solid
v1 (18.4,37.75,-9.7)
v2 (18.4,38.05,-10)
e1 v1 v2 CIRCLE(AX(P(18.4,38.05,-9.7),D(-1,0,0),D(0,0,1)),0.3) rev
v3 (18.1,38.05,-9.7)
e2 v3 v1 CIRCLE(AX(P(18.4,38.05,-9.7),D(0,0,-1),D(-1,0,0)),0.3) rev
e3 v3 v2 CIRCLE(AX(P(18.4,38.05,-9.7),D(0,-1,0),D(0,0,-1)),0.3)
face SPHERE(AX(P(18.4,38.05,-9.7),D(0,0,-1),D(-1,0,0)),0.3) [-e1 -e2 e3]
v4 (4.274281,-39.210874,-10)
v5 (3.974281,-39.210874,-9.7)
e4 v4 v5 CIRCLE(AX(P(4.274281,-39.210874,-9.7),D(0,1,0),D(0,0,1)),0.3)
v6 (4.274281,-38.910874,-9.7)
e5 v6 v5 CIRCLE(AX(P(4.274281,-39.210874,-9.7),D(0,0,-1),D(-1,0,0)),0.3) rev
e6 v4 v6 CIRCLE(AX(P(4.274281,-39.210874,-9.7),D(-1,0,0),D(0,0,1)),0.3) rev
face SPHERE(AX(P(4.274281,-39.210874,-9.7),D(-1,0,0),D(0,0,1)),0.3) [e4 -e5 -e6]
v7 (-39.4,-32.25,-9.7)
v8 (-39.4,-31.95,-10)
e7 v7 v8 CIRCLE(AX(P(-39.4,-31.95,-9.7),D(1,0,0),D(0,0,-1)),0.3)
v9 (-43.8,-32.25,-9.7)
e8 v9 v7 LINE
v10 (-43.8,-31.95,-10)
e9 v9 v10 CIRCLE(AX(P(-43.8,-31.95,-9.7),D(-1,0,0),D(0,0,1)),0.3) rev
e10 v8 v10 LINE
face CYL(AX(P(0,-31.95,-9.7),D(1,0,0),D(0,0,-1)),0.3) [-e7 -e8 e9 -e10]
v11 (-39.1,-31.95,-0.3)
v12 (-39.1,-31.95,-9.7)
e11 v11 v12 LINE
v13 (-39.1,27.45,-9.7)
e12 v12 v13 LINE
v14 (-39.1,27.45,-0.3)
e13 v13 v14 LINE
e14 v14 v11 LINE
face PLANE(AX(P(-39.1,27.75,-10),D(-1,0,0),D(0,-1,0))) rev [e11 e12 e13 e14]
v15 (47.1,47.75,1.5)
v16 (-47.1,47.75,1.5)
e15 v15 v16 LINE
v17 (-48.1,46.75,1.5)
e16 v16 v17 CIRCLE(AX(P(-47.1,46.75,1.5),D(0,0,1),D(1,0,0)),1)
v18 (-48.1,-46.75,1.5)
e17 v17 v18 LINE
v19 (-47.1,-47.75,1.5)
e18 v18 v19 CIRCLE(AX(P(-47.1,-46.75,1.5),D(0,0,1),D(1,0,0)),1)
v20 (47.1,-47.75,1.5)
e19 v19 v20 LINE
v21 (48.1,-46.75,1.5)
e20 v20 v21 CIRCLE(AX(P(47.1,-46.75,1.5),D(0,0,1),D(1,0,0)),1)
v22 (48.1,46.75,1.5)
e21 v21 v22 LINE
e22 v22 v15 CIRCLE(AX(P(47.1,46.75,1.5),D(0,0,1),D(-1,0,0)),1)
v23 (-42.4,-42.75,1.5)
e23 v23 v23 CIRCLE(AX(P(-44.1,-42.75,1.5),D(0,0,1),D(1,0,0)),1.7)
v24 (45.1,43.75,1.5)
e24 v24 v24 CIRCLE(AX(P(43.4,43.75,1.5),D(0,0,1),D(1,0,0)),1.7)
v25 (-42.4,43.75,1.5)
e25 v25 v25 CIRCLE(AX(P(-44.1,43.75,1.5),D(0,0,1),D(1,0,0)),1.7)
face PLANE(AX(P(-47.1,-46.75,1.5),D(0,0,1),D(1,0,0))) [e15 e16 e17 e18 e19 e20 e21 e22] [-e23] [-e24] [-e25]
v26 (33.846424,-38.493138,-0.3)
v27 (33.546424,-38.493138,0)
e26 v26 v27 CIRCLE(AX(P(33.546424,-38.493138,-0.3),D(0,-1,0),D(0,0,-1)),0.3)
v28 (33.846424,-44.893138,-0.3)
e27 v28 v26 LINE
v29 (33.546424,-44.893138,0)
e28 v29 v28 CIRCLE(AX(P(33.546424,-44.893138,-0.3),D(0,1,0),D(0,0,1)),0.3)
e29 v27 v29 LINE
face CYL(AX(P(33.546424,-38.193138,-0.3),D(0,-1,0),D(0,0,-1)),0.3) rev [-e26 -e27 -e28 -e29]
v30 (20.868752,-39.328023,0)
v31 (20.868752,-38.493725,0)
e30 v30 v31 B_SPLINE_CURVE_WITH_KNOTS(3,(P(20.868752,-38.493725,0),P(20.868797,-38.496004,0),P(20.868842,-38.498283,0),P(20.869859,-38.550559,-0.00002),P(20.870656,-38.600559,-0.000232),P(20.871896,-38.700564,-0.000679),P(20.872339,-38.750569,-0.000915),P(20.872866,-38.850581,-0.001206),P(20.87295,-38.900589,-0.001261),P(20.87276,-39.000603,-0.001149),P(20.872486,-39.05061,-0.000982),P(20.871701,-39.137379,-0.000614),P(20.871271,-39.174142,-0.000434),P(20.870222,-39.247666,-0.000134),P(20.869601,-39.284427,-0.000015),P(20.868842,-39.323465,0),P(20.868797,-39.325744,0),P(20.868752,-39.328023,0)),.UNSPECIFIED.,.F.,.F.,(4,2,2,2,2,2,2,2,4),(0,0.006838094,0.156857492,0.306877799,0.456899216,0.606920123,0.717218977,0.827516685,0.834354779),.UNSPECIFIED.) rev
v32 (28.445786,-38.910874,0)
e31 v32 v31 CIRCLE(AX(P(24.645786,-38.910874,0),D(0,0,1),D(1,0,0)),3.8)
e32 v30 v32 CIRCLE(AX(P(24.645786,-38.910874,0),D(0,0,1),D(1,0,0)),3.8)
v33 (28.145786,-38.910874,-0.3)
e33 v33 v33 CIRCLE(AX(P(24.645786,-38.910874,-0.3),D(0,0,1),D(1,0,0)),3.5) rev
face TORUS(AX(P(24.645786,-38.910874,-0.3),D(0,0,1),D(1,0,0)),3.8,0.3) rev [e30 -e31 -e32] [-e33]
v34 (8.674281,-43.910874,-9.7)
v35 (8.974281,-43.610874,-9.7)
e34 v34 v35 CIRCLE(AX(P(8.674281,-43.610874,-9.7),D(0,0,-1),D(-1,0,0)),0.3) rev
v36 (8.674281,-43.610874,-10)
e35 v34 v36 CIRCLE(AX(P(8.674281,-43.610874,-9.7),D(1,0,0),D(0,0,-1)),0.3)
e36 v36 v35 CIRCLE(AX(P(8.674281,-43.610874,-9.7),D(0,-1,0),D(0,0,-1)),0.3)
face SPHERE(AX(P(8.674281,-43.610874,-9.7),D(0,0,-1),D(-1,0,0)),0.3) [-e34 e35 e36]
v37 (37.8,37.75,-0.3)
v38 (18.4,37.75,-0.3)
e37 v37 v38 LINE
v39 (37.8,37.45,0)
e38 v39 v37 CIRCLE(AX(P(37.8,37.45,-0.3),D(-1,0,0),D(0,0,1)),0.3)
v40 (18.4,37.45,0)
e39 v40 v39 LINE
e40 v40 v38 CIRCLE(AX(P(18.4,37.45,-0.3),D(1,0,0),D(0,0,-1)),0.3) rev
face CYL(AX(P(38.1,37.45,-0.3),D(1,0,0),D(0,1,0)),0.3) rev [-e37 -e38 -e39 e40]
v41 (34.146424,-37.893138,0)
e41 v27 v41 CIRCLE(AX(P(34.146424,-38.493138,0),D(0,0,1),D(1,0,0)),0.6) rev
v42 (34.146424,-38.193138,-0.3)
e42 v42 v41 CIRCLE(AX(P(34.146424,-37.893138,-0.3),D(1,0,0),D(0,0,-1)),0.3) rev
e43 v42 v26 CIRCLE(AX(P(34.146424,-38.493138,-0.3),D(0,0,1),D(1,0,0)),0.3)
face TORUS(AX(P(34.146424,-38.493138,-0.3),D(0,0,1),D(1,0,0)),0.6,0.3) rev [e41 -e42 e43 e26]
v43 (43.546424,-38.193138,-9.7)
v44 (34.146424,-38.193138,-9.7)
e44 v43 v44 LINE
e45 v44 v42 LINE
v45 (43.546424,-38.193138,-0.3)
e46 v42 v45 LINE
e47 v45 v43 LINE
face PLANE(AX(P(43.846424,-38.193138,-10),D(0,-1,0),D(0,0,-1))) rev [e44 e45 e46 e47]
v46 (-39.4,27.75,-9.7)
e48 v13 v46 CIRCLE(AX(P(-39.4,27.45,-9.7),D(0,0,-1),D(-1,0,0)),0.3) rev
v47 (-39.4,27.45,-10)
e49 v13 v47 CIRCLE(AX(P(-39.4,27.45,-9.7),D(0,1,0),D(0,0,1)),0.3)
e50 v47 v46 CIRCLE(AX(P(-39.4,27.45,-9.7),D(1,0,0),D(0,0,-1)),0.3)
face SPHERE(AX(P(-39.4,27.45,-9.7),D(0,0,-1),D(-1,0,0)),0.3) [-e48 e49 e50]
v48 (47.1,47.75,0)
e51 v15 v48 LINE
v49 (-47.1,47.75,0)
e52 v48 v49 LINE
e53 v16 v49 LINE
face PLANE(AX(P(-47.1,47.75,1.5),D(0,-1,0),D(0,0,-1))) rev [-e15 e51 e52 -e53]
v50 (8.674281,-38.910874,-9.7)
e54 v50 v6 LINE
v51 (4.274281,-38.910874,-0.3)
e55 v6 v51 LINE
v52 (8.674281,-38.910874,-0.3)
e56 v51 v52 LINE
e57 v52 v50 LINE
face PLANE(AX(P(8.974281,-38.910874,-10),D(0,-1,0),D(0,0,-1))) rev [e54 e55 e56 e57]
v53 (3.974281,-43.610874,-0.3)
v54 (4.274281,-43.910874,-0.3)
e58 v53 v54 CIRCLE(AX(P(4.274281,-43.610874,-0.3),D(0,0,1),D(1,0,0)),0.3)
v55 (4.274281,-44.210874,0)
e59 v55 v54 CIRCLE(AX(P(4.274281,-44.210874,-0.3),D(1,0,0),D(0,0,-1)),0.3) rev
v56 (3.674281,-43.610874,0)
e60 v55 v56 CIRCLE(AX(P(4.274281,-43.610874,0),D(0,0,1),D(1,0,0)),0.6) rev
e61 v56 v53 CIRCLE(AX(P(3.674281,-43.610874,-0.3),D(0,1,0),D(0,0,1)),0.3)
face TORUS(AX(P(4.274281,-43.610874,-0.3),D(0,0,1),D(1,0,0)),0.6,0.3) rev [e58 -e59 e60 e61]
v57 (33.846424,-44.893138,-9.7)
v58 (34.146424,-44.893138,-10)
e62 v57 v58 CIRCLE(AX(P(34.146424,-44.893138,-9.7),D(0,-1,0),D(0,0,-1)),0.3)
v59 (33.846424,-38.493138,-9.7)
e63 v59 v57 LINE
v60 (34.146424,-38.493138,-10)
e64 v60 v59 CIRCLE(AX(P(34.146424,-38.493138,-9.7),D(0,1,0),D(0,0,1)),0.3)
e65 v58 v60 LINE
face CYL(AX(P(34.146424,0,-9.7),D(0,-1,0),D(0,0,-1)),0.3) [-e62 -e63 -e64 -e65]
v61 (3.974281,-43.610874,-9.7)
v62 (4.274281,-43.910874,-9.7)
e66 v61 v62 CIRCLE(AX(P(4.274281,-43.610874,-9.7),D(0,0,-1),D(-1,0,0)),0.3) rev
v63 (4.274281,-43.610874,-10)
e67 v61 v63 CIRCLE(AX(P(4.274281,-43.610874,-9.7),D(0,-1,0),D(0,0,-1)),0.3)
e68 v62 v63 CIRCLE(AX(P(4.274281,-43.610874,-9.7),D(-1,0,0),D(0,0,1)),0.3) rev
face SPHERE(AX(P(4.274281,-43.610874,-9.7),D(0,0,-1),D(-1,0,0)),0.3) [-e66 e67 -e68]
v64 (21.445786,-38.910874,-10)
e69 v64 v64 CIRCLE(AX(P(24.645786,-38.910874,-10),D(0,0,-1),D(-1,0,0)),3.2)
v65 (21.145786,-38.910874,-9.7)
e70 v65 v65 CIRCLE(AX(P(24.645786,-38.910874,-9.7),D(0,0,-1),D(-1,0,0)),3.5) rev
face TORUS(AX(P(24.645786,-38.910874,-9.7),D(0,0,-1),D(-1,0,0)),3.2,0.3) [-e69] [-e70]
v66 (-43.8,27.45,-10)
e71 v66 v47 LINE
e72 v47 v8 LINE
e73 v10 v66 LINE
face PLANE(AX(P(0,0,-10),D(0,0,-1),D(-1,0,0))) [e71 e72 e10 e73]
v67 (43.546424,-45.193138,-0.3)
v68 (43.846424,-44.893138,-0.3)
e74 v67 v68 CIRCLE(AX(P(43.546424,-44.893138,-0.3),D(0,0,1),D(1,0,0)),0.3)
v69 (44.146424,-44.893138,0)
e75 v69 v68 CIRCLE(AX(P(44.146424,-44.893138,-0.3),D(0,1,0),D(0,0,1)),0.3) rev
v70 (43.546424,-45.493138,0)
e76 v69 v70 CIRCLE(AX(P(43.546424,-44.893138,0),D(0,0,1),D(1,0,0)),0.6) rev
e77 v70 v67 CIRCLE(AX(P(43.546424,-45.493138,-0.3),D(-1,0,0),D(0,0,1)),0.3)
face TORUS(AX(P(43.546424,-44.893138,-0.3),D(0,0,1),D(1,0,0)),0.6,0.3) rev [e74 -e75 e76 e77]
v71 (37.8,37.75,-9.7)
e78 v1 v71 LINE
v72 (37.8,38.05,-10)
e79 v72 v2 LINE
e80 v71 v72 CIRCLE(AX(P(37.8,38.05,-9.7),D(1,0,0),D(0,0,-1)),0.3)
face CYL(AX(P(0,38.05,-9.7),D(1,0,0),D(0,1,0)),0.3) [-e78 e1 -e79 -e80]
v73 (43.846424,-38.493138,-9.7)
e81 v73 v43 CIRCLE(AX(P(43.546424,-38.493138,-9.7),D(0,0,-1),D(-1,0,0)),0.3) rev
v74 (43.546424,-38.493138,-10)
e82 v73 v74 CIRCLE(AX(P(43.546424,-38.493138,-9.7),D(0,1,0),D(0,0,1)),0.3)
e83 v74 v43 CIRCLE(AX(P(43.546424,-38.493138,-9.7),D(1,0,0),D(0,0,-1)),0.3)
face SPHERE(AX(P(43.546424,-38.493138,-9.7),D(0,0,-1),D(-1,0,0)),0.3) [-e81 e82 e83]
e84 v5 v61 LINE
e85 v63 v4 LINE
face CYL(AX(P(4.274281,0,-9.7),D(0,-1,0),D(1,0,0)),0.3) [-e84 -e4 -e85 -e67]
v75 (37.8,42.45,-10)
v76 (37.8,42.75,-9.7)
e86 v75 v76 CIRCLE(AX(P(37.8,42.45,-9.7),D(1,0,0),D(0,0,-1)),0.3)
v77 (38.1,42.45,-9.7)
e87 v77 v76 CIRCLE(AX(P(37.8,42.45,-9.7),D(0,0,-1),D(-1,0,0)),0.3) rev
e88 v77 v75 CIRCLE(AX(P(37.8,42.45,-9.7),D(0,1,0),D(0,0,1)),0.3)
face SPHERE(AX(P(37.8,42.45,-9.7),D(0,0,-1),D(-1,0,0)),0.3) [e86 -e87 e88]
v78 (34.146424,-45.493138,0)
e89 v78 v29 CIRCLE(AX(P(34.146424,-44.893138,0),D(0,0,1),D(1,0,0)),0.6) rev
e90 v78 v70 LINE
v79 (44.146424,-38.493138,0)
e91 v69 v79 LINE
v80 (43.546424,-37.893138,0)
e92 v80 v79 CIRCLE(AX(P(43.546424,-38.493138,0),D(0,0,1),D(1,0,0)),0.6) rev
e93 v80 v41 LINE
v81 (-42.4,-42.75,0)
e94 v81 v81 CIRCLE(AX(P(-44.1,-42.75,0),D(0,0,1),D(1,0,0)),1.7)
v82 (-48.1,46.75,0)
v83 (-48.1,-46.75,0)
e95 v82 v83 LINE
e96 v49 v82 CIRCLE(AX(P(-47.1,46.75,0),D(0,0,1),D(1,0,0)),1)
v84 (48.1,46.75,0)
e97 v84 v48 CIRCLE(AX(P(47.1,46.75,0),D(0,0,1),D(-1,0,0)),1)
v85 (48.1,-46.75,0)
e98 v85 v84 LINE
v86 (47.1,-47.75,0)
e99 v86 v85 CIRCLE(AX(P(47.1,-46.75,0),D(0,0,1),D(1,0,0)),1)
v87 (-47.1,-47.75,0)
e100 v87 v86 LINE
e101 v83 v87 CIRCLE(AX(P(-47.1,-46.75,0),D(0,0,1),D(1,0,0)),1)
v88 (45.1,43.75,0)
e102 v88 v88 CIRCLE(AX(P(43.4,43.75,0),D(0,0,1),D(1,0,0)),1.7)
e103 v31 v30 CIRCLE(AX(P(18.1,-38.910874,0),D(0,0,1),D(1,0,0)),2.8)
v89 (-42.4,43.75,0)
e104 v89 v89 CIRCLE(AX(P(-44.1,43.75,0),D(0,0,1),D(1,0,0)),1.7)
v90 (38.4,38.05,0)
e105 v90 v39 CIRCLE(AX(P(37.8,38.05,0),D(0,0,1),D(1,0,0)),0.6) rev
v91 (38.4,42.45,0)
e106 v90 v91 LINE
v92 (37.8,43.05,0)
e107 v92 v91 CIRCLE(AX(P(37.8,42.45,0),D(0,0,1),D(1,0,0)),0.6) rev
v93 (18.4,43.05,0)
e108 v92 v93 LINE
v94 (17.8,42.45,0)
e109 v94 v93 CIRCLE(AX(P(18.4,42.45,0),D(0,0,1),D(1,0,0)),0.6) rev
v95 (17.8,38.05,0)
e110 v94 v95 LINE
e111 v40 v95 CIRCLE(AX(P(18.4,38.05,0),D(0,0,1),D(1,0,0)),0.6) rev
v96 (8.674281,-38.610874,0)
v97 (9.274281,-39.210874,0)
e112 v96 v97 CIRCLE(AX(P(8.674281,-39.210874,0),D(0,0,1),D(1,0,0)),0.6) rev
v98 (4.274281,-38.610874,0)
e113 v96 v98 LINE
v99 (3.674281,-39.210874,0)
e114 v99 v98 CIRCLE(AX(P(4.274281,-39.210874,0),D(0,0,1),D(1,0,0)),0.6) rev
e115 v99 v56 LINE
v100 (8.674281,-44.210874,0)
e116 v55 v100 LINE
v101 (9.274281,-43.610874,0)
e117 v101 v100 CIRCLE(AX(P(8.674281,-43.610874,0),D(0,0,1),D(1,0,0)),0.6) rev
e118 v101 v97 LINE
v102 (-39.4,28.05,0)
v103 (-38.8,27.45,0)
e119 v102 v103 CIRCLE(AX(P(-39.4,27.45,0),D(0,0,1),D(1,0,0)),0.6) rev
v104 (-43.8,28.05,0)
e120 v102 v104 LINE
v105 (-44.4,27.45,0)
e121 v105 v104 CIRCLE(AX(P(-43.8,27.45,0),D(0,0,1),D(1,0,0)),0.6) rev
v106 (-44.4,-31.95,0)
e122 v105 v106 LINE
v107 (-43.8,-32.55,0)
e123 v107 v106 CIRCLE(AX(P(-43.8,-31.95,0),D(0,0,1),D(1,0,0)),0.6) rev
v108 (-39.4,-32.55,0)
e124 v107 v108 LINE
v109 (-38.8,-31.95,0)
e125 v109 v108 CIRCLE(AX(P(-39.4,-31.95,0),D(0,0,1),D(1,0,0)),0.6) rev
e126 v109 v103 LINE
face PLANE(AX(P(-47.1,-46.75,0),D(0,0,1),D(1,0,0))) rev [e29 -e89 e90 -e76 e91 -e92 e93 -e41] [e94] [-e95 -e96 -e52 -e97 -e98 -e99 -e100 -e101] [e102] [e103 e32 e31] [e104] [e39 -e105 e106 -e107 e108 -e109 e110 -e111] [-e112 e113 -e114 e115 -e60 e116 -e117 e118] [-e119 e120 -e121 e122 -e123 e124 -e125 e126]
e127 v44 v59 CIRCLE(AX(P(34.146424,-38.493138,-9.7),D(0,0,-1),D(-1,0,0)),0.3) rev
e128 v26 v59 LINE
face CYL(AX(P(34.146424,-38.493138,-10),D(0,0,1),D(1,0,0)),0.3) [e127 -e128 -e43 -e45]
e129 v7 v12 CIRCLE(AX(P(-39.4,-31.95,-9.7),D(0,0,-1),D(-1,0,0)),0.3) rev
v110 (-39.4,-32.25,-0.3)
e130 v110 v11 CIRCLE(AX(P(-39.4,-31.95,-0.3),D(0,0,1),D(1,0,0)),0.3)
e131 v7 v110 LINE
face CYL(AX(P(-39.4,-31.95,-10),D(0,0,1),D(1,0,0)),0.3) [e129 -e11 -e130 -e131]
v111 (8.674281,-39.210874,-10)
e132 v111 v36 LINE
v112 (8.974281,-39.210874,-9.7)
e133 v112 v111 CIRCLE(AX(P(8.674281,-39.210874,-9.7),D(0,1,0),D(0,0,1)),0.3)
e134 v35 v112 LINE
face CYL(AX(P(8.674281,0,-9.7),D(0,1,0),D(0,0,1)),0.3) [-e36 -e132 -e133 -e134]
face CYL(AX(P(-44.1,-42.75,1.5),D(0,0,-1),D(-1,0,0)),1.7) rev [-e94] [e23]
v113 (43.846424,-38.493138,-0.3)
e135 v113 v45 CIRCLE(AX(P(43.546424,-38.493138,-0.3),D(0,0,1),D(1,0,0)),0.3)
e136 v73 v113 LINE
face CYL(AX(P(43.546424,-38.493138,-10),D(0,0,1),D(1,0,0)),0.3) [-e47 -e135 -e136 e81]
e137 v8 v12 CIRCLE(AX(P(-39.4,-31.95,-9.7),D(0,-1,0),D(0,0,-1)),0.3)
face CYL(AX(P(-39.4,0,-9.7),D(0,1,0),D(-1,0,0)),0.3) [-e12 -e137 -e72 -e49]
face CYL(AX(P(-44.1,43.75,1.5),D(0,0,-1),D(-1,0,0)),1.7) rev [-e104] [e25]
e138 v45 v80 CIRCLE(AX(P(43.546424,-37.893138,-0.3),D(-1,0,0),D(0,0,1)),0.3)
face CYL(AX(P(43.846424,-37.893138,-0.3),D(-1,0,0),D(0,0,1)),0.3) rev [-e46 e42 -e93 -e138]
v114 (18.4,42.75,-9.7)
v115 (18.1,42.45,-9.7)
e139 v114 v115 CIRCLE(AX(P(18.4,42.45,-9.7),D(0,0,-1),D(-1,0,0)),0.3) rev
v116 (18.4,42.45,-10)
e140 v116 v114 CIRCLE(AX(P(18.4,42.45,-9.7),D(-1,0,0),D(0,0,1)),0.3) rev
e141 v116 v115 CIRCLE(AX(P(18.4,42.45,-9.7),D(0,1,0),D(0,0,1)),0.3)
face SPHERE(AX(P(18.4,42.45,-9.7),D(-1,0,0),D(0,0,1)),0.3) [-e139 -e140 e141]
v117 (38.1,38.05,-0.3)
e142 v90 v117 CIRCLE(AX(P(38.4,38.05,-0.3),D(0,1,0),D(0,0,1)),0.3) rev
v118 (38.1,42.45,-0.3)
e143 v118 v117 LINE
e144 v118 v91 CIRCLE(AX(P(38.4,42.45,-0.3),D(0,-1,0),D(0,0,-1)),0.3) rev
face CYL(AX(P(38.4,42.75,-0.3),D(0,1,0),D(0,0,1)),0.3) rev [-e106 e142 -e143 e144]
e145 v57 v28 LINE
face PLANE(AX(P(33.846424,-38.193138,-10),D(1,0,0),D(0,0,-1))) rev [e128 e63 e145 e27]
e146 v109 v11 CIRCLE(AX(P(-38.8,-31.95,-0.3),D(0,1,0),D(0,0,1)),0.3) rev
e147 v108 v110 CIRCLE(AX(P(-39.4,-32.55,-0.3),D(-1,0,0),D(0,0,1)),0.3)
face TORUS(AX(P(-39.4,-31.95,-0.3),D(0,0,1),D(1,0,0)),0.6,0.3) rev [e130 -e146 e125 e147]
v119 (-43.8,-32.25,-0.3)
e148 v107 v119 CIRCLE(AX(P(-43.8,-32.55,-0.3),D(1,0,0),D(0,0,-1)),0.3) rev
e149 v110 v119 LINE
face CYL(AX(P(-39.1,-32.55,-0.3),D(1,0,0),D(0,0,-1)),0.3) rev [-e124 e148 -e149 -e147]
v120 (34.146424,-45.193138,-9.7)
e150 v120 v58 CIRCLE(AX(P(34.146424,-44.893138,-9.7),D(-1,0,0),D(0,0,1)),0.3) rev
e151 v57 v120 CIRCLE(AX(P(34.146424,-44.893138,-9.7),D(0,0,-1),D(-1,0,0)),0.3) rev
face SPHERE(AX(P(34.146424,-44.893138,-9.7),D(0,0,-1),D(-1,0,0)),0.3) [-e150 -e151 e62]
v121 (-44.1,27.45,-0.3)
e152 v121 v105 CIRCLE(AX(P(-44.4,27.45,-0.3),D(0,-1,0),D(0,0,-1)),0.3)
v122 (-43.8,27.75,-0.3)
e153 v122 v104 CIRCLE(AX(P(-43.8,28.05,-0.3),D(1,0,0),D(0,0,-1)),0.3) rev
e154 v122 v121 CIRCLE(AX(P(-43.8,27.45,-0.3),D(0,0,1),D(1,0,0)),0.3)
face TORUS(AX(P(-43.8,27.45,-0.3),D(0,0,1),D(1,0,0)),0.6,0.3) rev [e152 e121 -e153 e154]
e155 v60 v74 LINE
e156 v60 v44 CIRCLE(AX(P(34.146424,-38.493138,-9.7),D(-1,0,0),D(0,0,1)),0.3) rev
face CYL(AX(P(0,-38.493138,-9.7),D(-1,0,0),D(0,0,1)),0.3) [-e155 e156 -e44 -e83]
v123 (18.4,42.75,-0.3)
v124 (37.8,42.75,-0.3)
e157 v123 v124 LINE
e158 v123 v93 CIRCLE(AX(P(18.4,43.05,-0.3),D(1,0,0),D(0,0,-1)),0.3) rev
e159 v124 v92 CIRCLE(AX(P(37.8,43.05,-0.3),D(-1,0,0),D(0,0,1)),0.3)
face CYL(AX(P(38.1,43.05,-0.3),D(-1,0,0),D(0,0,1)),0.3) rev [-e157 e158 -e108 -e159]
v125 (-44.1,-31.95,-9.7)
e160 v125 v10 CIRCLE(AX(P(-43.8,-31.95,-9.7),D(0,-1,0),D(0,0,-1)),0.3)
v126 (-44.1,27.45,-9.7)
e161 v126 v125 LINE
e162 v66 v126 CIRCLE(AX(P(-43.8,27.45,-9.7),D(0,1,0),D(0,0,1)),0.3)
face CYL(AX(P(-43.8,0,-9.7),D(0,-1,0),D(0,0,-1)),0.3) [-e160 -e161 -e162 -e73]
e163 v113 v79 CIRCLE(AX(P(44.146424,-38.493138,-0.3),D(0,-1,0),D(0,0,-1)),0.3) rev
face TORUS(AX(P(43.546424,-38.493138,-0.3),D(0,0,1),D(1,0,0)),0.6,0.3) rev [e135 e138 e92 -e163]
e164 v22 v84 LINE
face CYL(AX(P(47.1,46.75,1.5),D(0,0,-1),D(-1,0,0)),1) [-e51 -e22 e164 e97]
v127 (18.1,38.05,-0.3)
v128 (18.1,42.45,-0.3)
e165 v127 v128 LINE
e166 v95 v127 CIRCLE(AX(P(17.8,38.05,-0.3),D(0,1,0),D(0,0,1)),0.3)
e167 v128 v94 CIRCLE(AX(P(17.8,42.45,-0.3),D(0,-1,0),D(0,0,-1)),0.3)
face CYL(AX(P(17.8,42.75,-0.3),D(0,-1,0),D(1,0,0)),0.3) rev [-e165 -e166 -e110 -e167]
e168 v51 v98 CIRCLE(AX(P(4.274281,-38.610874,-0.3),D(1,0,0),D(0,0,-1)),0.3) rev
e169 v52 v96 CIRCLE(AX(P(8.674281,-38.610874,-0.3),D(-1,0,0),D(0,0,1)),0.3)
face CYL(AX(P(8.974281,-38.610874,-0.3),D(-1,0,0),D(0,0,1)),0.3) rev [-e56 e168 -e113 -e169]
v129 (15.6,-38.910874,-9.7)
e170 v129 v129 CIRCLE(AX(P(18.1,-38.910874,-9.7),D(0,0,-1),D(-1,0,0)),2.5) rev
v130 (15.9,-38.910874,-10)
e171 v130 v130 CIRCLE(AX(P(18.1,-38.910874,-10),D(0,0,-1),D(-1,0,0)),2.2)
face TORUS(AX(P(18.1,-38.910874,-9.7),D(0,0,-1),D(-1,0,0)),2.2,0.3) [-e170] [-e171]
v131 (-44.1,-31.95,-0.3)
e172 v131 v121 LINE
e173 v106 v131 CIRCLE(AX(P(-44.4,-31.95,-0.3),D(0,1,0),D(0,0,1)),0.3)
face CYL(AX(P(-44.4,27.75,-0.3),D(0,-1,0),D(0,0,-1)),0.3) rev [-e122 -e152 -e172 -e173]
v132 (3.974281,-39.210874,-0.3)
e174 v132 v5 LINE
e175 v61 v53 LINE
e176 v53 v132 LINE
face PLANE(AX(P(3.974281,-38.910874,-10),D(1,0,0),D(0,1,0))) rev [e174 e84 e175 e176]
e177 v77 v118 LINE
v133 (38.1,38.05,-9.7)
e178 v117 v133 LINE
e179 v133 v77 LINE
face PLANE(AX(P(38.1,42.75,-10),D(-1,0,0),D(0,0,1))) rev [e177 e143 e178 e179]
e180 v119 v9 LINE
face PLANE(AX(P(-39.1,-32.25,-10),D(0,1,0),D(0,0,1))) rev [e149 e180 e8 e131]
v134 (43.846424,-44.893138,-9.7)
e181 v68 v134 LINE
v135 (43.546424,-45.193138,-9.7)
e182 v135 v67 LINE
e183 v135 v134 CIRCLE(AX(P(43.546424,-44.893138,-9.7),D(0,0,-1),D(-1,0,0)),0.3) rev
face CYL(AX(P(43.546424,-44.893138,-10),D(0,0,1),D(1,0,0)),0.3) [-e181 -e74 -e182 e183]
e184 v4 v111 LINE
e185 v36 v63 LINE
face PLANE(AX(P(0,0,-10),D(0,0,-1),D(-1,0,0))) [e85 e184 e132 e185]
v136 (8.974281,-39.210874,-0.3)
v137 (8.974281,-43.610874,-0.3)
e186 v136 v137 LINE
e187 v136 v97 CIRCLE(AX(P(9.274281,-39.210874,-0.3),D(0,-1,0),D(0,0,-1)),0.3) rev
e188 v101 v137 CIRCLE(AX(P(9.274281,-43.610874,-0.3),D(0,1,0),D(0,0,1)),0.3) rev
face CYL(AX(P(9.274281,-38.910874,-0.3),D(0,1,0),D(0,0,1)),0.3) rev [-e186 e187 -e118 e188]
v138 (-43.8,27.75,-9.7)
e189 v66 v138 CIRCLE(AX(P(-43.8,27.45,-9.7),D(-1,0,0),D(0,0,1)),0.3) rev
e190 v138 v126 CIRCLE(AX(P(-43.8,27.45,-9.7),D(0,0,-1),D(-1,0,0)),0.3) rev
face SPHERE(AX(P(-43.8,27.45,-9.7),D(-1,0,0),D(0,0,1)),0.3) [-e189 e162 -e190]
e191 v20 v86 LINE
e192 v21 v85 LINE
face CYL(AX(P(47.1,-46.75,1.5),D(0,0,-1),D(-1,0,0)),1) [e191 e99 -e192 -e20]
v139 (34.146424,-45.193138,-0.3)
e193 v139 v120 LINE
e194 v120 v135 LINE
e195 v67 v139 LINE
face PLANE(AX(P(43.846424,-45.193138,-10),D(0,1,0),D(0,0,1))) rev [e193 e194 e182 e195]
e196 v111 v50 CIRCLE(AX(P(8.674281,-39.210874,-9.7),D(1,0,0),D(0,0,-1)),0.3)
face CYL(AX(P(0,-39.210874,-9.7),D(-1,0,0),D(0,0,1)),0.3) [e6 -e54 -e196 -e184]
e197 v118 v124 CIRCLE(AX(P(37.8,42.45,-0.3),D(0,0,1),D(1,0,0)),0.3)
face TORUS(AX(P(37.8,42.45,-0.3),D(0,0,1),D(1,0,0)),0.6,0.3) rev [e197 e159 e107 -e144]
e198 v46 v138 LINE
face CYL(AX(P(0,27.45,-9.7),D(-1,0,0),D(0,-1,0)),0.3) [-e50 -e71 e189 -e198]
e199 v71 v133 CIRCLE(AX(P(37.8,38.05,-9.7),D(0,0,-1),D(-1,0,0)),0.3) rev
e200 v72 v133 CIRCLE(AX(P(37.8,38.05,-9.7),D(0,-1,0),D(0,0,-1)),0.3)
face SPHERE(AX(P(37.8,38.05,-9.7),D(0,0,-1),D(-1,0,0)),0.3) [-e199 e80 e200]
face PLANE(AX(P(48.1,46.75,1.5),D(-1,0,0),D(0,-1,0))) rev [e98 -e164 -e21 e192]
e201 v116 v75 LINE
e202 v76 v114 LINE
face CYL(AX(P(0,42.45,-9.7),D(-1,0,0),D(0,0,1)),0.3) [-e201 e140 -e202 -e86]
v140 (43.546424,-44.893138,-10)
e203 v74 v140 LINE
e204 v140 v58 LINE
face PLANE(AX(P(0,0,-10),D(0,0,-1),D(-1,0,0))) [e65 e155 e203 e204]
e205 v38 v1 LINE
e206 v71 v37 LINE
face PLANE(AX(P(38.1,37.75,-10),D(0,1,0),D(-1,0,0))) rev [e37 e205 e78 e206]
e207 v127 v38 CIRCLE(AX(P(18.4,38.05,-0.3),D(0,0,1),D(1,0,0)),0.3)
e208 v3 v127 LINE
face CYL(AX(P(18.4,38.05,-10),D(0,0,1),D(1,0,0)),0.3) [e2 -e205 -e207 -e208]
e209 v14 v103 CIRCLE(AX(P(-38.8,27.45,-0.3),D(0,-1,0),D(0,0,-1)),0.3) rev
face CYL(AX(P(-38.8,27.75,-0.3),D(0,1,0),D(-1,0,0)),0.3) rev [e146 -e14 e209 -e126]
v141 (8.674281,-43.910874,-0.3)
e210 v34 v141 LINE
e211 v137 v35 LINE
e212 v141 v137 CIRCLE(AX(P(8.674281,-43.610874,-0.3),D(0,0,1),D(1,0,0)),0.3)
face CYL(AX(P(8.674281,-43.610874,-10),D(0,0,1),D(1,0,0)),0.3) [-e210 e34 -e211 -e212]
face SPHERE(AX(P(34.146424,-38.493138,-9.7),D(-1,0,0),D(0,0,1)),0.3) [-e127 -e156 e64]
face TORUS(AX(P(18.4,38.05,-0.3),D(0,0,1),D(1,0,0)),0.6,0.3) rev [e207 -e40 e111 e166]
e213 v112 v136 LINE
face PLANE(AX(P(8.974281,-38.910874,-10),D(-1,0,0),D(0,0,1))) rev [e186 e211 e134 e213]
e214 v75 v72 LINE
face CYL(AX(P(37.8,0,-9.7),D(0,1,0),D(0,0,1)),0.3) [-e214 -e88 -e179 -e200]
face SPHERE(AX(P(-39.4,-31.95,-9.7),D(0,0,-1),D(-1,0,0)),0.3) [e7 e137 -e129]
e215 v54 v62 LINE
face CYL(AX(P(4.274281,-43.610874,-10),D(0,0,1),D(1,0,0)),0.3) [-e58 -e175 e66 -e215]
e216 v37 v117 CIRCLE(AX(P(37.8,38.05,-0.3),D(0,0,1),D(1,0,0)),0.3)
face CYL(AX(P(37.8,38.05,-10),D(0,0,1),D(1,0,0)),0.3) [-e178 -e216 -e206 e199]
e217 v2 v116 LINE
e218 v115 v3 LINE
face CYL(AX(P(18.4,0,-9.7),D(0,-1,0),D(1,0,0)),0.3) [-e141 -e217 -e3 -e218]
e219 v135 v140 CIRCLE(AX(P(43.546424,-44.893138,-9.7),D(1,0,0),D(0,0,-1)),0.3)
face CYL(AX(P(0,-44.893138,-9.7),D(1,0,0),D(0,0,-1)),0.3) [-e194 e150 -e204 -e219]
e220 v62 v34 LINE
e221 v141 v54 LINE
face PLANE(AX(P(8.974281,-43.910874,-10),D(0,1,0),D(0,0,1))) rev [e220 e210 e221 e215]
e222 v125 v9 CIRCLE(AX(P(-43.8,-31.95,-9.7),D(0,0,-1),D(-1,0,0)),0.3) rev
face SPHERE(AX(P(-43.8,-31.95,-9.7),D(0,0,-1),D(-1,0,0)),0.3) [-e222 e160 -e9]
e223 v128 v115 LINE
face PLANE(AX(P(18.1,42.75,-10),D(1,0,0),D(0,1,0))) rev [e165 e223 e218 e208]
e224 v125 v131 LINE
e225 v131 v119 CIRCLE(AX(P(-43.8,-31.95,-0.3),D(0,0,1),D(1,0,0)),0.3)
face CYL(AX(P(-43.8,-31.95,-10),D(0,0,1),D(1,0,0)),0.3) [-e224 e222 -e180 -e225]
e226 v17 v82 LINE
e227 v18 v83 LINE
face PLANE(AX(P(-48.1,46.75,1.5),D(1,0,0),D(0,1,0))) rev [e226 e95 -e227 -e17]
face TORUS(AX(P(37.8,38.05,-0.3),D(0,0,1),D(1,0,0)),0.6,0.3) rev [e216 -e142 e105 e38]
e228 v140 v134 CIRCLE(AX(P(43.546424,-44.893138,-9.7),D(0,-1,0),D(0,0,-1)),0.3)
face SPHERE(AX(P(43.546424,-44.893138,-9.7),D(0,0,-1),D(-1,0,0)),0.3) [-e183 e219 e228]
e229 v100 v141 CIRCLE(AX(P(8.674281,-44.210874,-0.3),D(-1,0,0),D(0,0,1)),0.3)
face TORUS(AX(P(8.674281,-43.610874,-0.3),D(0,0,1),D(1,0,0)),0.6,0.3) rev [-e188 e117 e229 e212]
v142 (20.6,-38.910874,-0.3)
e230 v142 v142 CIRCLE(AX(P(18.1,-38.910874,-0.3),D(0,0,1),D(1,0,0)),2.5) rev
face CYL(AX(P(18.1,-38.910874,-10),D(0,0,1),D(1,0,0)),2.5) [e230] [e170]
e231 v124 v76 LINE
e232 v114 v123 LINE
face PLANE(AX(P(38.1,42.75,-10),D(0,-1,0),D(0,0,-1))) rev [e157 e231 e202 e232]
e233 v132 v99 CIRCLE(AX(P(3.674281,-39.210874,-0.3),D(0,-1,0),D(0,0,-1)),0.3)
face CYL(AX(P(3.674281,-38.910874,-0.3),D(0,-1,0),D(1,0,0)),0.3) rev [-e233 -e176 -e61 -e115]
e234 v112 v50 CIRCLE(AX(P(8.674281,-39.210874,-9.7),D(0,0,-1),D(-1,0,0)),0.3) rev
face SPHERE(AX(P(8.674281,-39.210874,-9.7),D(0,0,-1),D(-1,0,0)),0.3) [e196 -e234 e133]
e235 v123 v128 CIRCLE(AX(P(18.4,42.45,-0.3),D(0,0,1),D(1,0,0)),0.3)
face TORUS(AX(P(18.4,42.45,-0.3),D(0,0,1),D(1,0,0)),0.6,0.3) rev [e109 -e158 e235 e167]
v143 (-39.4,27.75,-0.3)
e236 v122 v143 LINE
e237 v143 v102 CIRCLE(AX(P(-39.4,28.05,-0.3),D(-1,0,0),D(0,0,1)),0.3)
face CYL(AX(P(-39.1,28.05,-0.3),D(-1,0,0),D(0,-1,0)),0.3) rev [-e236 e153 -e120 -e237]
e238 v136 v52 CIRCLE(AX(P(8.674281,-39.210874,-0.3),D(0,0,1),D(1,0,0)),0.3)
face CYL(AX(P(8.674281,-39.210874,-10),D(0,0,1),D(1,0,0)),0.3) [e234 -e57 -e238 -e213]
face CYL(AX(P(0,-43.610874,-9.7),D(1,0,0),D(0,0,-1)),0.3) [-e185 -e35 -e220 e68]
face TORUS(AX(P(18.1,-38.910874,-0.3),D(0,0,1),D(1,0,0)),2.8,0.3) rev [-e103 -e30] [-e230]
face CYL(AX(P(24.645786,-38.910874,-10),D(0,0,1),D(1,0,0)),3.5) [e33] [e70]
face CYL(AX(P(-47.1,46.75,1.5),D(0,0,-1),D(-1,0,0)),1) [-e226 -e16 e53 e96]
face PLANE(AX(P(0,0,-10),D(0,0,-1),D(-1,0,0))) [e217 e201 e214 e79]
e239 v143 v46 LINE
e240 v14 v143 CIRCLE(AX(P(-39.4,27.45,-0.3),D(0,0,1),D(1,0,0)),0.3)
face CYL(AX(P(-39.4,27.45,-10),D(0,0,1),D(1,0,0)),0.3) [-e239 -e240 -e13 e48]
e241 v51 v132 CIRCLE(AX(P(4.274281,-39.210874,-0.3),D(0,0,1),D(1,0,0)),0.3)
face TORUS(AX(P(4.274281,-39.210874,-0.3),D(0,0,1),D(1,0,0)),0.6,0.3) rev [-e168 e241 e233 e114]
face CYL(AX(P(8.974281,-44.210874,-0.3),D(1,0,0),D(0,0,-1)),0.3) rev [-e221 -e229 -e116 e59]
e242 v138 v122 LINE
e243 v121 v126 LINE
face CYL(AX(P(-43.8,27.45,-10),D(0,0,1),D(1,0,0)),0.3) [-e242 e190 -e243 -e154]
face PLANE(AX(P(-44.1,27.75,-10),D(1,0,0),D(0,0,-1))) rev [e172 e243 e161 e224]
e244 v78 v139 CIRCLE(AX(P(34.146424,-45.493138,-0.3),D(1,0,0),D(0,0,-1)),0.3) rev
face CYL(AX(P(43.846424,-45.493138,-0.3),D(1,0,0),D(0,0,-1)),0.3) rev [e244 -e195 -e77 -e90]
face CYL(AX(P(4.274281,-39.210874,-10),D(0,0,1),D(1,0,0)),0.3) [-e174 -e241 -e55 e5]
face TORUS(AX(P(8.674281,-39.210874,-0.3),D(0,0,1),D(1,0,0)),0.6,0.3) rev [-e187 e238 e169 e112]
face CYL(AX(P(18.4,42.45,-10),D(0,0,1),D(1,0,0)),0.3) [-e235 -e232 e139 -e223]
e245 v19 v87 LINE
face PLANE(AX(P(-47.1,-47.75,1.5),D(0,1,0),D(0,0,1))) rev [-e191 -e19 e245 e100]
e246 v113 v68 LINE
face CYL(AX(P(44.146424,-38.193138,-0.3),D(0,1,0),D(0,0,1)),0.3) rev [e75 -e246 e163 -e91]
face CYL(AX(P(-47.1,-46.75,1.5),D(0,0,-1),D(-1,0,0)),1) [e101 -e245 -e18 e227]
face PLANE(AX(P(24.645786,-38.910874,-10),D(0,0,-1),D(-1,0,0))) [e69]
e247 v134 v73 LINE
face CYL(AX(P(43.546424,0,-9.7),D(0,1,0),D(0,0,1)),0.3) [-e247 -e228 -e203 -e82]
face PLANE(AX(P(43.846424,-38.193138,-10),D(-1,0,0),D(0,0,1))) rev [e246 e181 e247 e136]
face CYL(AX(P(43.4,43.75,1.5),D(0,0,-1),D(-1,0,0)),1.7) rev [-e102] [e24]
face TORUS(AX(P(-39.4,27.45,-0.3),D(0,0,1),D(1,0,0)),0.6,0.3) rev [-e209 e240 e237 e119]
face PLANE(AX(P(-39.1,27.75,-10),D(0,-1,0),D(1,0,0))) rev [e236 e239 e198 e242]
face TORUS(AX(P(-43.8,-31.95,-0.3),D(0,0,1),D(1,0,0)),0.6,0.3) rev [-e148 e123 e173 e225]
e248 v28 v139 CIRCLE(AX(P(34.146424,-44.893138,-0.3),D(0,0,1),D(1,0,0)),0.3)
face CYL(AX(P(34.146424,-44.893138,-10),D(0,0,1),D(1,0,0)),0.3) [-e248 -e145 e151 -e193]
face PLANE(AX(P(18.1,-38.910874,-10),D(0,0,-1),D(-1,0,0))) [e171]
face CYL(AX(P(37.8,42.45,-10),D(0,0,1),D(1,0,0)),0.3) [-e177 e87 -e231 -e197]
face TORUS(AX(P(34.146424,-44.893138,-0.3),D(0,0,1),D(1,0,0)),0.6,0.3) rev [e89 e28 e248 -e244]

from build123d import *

# Parameters (mm, degrees)
SKETCH1_R           = 1.7
BOSS_EXTRUDE1_DEPTH = 1.5
SKETCH2_W           = 10
SKETCH2_H           = 7
BOSS_EXTRUDE2_DEPTH = 10
FILLET1_R           = 0.3
SKETCH3_R           = 3.5
SKETCH3_R_2         = 2.5
SKETCH3_W           = 5
SKETCH3_H           = 60
SKETCH3_W_2         = 20
SKETCH3_H_2         = 5
BOSS_EXTRUDE3_DEPTH = 10
FILLET2_R           = 0.3


with BuildPart() as part:
    # Sketch1 → Boss-Extrude1 (new body)
    with BuildSketch(Plane.XY):
        with BuildLine():
            Line((-47.1, 47.75), (47.1, 47.75))
            ThreePointArc((47.1, 47.75), (47.807106781, 47.457106781), (48.1, 46.75))
            Line((48.1, 46.75), (48.1, -46.75))
            ThreePointArc((48.1, -46.75), (47.807106781, -47.457106781), (47.1, -47.75))
            Line((47.1, -47.75), (-47.1, -47.75))
            ThreePointArc((-47.1, -47.75), (-47.807106781, -47.457106781), (-48.1, -46.75))
            Line((-48.1, -46.75), (-48.1, 46.75))
            ThreePointArc((-48.1, 46.75), (-47.807106781, 47.457106781), (-47.1, 47.75))
        make_face()
        with Locations((-44.1, 43.75)):
            Circle(SKETCH1_R, mode=Mode.SUBTRACT)
        with Locations((-44.1, -42.75)):
            Circle(SKETCH1_R, mode=Mode.SUBTRACT)
        with Locations((43.4, 43.75)):
            Circle(SKETCH1_R, mode=Mode.SUBTRACT)
    extrude(amount=BOSS_EXTRUDE1_DEPTH)

    # Sketch2 → Boss-Extrude2 (add)
    with BuildSketch(Plane(origin=(0, 0, 0), x_dir=(-1, 0, 0), z_dir=(0, 0, -1))):
        with Locations((-38.84642424, -41.693137568)):
            Rectangle(SKETCH2_W, SKETCH2_H)
    extrude(amount=BOSS_EXTRUDE2_DEPTH)

    # Fillet1
    fillet1_edges = [part.edges().sort_by_distance(p)[0] for p in [
        (43.84642424, -41.693137568, 0),
        (43.84642424, -38.193137568, -5),
        (38.84642424, -45.193137568, 0),
        (43.84642424, -45.193137568, -5),
        (33.84642424, -41.693137568, 0),
        (33.84642424, -45.193137568, -5),
        (38.84642424, -38.193137568, 0),
        (33.84642424, -38.193137568, -5),
        (43.84642424, -41.693137568, -10),
        (38.84642424, -45.193137568, -10),
        (33.84642424, -41.693137568, -10),
        (38.84642424, -38.193137568, -10),
    ]]
    fillet(fillet1_edges, radius=FILLET1_R)

    # Sketch3 → Boss-Extrude3 (add)
    with BuildSketch(Plane(origin=(0, 0, 0), x_dir=(-1, 0, 0), z_dir=(0, 0, -1))):
        with Locations(Location((-24.645786009, -38.910874107, 0), (0, 0, 180))):
            Circle(SKETCH3_R)
        with Locations(Location((-18.1, -38.910874107, 0), (0, 0, 180))):
            Circle(SKETCH3_R_2)
        with Locations((41.6, -2.25)):
            Rectangle(SKETCH3_W, SKETCH3_H)
        with Locations((-28.1, 40.25)):
            Rectangle(SKETCH3_W_2, SKETCH3_H_2)
        with Locations((-6.474280775, -41.410874107)):
            Rectangle(SKETCH3_W, SKETCH3_H_2)
    extrude(amount=BOSS_EXTRUDE3_DEPTH)

    # Fillet2
    # the kernel refuses this fillet: 0.3 mm, written as the material it adds along each edge
    with BuildSketch(Plane(origin=(24.645786009, -38.910874107, 0), x_dir=(1, 0, 0), z_dir=(0, 1, 0))) as fillet2_piece_1:
        with BuildLine():
            CenterArc((3.5 + FILLET2_R, FILLET2_R), FILLET2_R, 180, 90)
            Line((3.5, FILLET2_R), (3.5, 0))
            Line((3.5, 0), (3.5 + FILLET2_R, 0))
        make_face()
    revolve(axis=Axis((24.645786009, -38.910874107, 0), (0, 0, -1)))
    with BuildSketch(Plane(origin=(18.1, -38.910874107, 0), x_dir=(1, 0, 0), z_dir=(0, 1, 0))) as fillet2_piece_2:
        with BuildLine():
            CenterArc((2.5 + FILLET2_R, FILLET2_R), FILLET2_R, 180, 90)
            Line((2.5, FILLET2_R), (2.5, 0))
            Line((2.5, 0), (2.5 + FILLET2_R, 0))
        make_face()
    revolve(axis=Axis((18.1, -38.910874107, 0), (0, 0, -1)))
    # the kernel refuses this fillet: 0.3 mm, written as the material it takes off along each edge
    with BuildSketch(Plane(origin=(-39.4, 27.45, -9.7), x_dir=(0, 1, 0), z_dir=(1, 0, 0))) as fillet2_2_piece_1_section:
        Polygon((0, 0), (FILLET2_R, 0), (FILLET2_R, -FILLET2_R), (0, -FILLET2_R), align=None)
    fillet2_2_piece_1 = extrude(amount=FILLET2_R, mode=Mode.PRIVATE)
    fillet2_2_piece_1 = fillet2_2_piece_1 - Plane(origin=(-39.4, 27.45, -9.7), x_dir=(0, -0.7071067811865475, 0.7071067811865475), z_dir=(1, 0, 0)) * Sphere(FILLET2_R, mode=Mode.PRIVATE)
    add(fillet2_2_piece_1, mode=Mode.SUBTRACT)
    with BuildSketch(Plane(origin=(-39.4, -31.95, -9.7), x_dir=(0, -1, 0), z_dir=(1, 0, 0))) as fillet2_2_piece_2_section:
        Polygon((0, 0), (FILLET2_R, 0), (FILLET2_R, FILLET2_R), (0, FILLET2_R), align=None)
    fillet2_2_piece_2 = extrude(amount=FILLET2_R, mode=Mode.PRIVATE)
    fillet2_2_piece_2 = fillet2_2_piece_2 - Plane(origin=(-39.4, -31.95, -9.7), x_dir=(0, 0.7071067811865475, 0.7071067811865475), z_dir=(1, 0, 0)) * Sphere(FILLET2_R, mode=Mode.PRIVATE)
    add(fillet2_2_piece_2, mode=Mode.SUBTRACT)
    with BuildSketch(Plane(origin=(-43.8, -31.95, -9.7), x_dir=(-1, 0, 0), z_dir=(0, -1, 0))) as fillet2_2_piece_3_section:
        Polygon((0, 0), (FILLET2_R, 0), (FILLET2_R, FILLET2_R), (0, FILLET2_R), align=None)
    fillet2_2_piece_3 = extrude(amount=FILLET2_R, mode=Mode.PRIVATE)
    fillet2_2_piece_3 = fillet2_2_piece_3 - Plane(origin=(-43.8, -31.95, -9.7), x_dir=(0.7071067811865475, 0, 0.7071067811865475), z_dir=(0, -1, 0)) * Sphere(FILLET2_R, mode=Mode.PRIVATE)
    add(fillet2_2_piece_3, mode=Mode.SUBTRACT)
    with BuildSketch(Plane(origin=(-43.8, 27.45, -9.7), x_dir=(-1, 0, 0), z_dir=(0, 1, 0))) as fillet2_2_piece_4_section:
        Polygon((0, 0), (FILLET2_R, 0), (FILLET2_R, -FILLET2_R), (0, -FILLET2_R), align=None)
    fillet2_2_piece_4 = extrude(amount=FILLET2_R, mode=Mode.PRIVATE)
    fillet2_2_piece_4 = fillet2_2_piece_4 - Plane(origin=(-43.8, 27.45, -9.7), x_dir=(0.7071067811865475, 0, 0.7071067811865475), z_dir=(0, 1, 0)) * Sphere(FILLET2_R, mode=Mode.PRIVATE)
    add(fillet2_2_piece_4, mode=Mode.SUBTRACT)
    with BuildSketch(Plane(origin=(37.8, 42.45, -9.7), x_dir=(1, 0, 0), z_dir=(0, 0, -1))) as fillet2_2_piece_5_section:
        Polygon((0, 0), (FILLET2_R, 0), (FILLET2_R, -FILLET2_R), (0, -FILLET2_R), align=None)
    fillet2_2_piece_5 = extrude(amount=FILLET2_R, mode=Mode.PRIVATE)
    fillet2_2_piece_5 = fillet2_2_piece_5 - Plane(origin=(37.8, 42.45, -9.7), x_dir=(-0.7071067811865475, -0.7071067811865475, 0), z_dir=(0, 0, -1)) * Sphere(FILLET2_R, mode=Mode.PRIVATE)
    add(fillet2_2_piece_5, mode=Mode.SUBTRACT)
    with BuildSketch(Plane(origin=(37.8, 38.05, -9.7), x_dir=(0, -1, 0), z_dir=(1, 0, 0))) as fillet2_2_piece_6_section:
        Polygon((0, 0), (FILLET2_R, 0), (FILLET2_R, FILLET2_R), (0, FILLET2_R), align=None)
    fillet2_2_piece_6 = extrude(amount=FILLET2_R, mode=Mode.PRIVATE)
    fillet2_2_piece_6 = fillet2_2_piece_6 - Plane(origin=(37.8, 38.05, -9.7), x_dir=(0, 0.7071067811865475, 0.7071067811865475), z_dir=(1, 0, 0)) * Sphere(FILLET2_R, mode=Mode.PRIVATE)
    add(fillet2_2_piece_6, mode=Mode.SUBTRACT)
    with BuildSketch(Plane(origin=(18.4, 38.05, -9.7), x_dir=(0, -1, 0), z_dir=(-1, 0, 0))) as fillet2_2_piece_7_section:
        Polygon((0, 0), (FILLET2_R, 0), (FILLET2_R, -FILLET2_R), (0, -FILLET2_R), align=None)
    fillet2_2_piece_7 = extrude(amount=FILLET2_R, mode=Mode.PRIVATE)
    fillet2_2_piece_7 = fillet2_2_piece_7 - Plane(origin=(18.4, 38.05, -9.7), x_dir=(0, 0.7071067811865475, 0.7071067811865475), z_dir=(-1, 0, 0)) * Sphere(FILLET2_R, mode=Mode.PRIVATE)
    add(fillet2_2_piece_7, mode=Mode.SUBTRACT)
    with BuildSketch(Plane(origin=(18.4, 42.45, -9.7), x_dir=(0, 0, -1), z_dir=(-1, 0, 0))) as fillet2_2_piece_8_section:
        Polygon((0, 0), (FILLET2_R, 0), (FILLET2_R, -FILLET2_R), (0, -FILLET2_R), align=None)
    fillet2_2_piece_8 = extrude(amount=FILLET2_R, mode=Mode.PRIVATE)
    fillet2_2_piece_8 = fillet2_2_piece_8 - Plane(origin=(18.4, 42.45, -9.7), x_dir=(0, -0.7071067811865475, 0.7071067811865475), z_dir=(-1, 0, 0)) * Sphere(FILLET2_R, mode=Mode.PRIVATE)
    add(fillet2_2_piece_8, mode=Mode.SUBTRACT)
    with BuildSketch(Plane(origin=(8.674280775, -39.210874107, -9.7), x_dir=(1, 0, 0), z_dir=(0, 0, -1))) as fillet2_2_piece_9_section:
        Polygon((0, 0), (FILLET2_R, 0), (FILLET2_R, -FILLET2_R), (0, -FILLET2_R), align=None)
    fillet2_2_piece_9 = extrude(amount=FILLET2_R, mode=Mode.PRIVATE)
    fillet2_2_piece_9 = fillet2_2_piece_9 - Plane(origin=(8.674280775, -39.210874107, -9.7), x_dir=(-0.7071067811865475, -0.7071067811865475, 0), z_dir=(0, 0, -1)) * Sphere(FILLET2_R, mode=Mode.PRIVATE)
    add(fillet2_2_piece_9, mode=Mode.SUBTRACT)
    with BuildSketch(Plane(origin=(8.674280775, -43.610874107, -9.7), x_dir=(0, -1, 0), z_dir=(1, 0, 0))) as fillet2_2_piece_10_section:
        Polygon((0, 0), (FILLET2_R, 0), (FILLET2_R, FILLET2_R), (0, FILLET2_R), align=None)
    fillet2_2_piece_10 = extrude(amount=FILLET2_R, mode=Mode.PRIVATE)
    fillet2_2_piece_10 = fillet2_2_piece_10 - Plane(origin=(8.674280775, -43.610874107, -9.7), x_dir=(0, 0.7071067811865475, 0.7071067811865475), z_dir=(1, 0, 0)) * Sphere(FILLET2_R, mode=Mode.PRIVATE)
    add(fillet2_2_piece_10, mode=Mode.SUBTRACT)
    with BuildSketch(Plane(origin=(4.274280775, -43.610874107, -9.7), x_dir=(0, 0, -1), z_dir=(0, -1, 0))) as fillet2_2_piece_11_section:
        Polygon((0, 0), (FILLET2_R, 0), (FILLET2_R, -FILLET2_R), (0, -FILLET2_R), align=None)
    fillet2_2_piece_11 = extrude(amount=FILLET2_R, mode=Mode.PRIVATE)
    fillet2_2_piece_11 = fillet2_2_piece_11 - Plane(origin=(4.274280775, -43.610874107, -9.7), x_dir=(0.7071067811865475, 0, 0.7071067811865475), z_dir=(0, -1, 0)) * Sphere(FILLET2_R, mode=Mode.PRIVATE)
    add(fillet2_2_piece_11, mode=Mode.SUBTRACT)
    with BuildSketch(Plane(origin=(4.274280775, -39.210874107, -9.7), x_dir=(0, 1, 0), z_dir=(0, 0, -1))) as fillet2_2_piece_12_section:
        Polygon((0, 0), (FILLET2_R, 0), (FILLET2_R, -FILLET2_R), (0, -FILLET2_R), align=None)
    fillet2_2_piece_12 = extrude(amount=FILLET2_R, mode=Mode.PRIVATE)
    fillet2_2_piece_12 = fillet2_2_piece_12 - Plane(origin=(4.274280775, -39.210874107, -9.7), x_dir=(0.7071067811865475, -0.7071067811865477, 0), z_dir=(0, 0, -1)) * Sphere(FILLET2_R, mode=Mode.PRIVATE)
    add(fillet2_2_piece_12, mode=Mode.SUBTRACT)
    with BuildSketch(Plane(origin=(-39.1, 27.75, 0), x_dir=(0, -1, 0), z_dir=(0, 0, -1)), Plane(origin=(-44.1, 27.75, 0), x_dir=(1, 0, 0), z_dir=(0, 0, -1)), Plane(origin=(38.1, 42.75, 0), x_dir=(0, -1, 0), z_dir=(0, 0, -1)), Plane(origin=(18.1, 42.75, 0), x_dir=(1, 0, 0), z_dir=(0, 0, -1)), Plane(origin=(8.974280775, -38.910874107, 0), x_dir=(0, -1, 0), z_dir=(0, 0, -1)), Plane(origin=(3.974280775, -38.910874107, 0), x_dir=(1, 0, 0), z_dir=(0, 0, -1))) as fillet2_2_piece_13:
        with BuildLine():
            CenterArc((FILLET2_R, FILLET2_R), FILLET2_R, 180, 90)
            Line((0, FILLET2_R), (0, 0))
            Line((0, 0), (FILLET2_R, 0))
        make_face()
    extrude(amount=9.7, mode=Mode.SUBTRACT)
    with BuildSketch(Plane(origin=(-39.1, -32.25, 0), x_dir=(0, 1, 0), z_dir=(0, 0, -1)), Plane(origin=(-44.1, -32.25, 0), x_dir=(1, 0, 0), z_dir=(0, 0, -1)), Plane(origin=(38.1, 37.75, 0), x_dir=(0, 1, 0), z_dir=(0, 0, -1)), Plane(origin=(18.1, 37.75, 0), x_dir=(1, 0, 0), z_dir=(0, 0, -1)), Plane(origin=(8.974280775, -43.910874107, 0), x_dir=(0, 1, 0), z_dir=(0, 0, -1)), Plane(origin=(3.974280775, -43.910874107, 0), x_dir=(1, 0, 0), z_dir=(0, 0, -1))) as fillet2_2_piece_14:
        with BuildLine():
            CenterArc((FILLET2_R, -FILLET2_R), FILLET2_R, 90, 90)
            Line((0, -FILLET2_R), (0, 0))
            Line((0, 0), (FILLET2_R, 0))
        make_face()
    extrude(amount=9.7, mode=Mode.SUBTRACT)
    with BuildSketch(Plane(origin=(-39.1, -31.95, -10), x_dir=(0, 0, 1), z_dir=(0, 1, 0)), Plane(origin=(-44.1, 27.45, -10), x_dir=(0, 0, 1), z_dir=(0, -1, 0))) as fillet2_2_piece_15:
        with BuildLine():
            CenterArc((FILLET2_R, -FILLET2_R), FILLET2_R, 90, 90)
            Line((0, -FILLET2_R), (0, 0))
            Line((0, 0), (FILLET2_R, 0))
        make_face()
    extrude(amount=59.4, mode=Mode.SUBTRACT)
    with BuildSketch(Plane(origin=(-43.8, -32.25, -10), x_dir=(0, 0, 1), z_dir=(1, 0, 0)), Plane(origin=(-39.4, 27.75, -10), x_dir=(0, 0, 1), z_dir=(-1, 0, 0)), Plane(origin=(38.1, 38.05, -10), x_dir=(0, 0, 1), z_dir=(0, 1, 0)), Plane(origin=(18.1, 42.45, -10), x_dir=(0, 0, 1), z_dir=(0, -1, 0)), Plane(origin=(8.974280775, -43.610874107, -10), x_dir=(0, 0, 1), z_dir=(0, 1, 0)), Plane(origin=(4.274280775, -43.910874107, -10), x_dir=(0, 0, 1), z_dir=(1, 0, 0)), Plane(origin=(3.974280775, -39.210874107, -10), x_dir=(0, 0, 1), z_dir=(0, -1, 0)), Plane(origin=(8.674280775, -38.910874107, -10), x_dir=(0, 0, 1), z_dir=(-1, 0, 0))) as fillet2_2_piece_16:
        with BuildLine():
            CenterArc((FILLET2_R, -FILLET2_R), FILLET2_R, 90, 90)
            Line((0, -FILLET2_R), (0, 0))
            Line((0, 0), (FILLET2_R, 0))
        make_face()
    extrude(amount=4.4, mode=Mode.SUBTRACT)
    with BuildSketch(Plane(origin=(18.4, 37.75, -10), x_dir=(0, 0, 1), z_dir=(1, 0, 0)), Plane(origin=(37.8, 42.75, -10), x_dir=(0, 0, 1), z_dir=(-1, 0, 0))) as fillet2_2_piece_17:
        with BuildLine():
            CenterArc((FILLET2_R, -FILLET2_R), FILLET2_R, 90, 90)
            Line((0, -FILLET2_R), (0, 0))
            Line((0, 0), (FILLET2_R, 0))
        make_face()
    extrude(amount=19.4, mode=Mode.SUBTRACT)
    with BuildSketch(Plane(origin=(24.645786009, -38.910874107, -10), x_dir=(1, 0, 0), z_dir=(0, 1, 0))) as fillet2_2_piece_18:
        with BuildLine():
            CenterArc((3.5 - FILLET2_R, -FILLET2_R), FILLET2_R, 0, 90)
            Line((3.5 - FILLET2_R, 0), (3.5, 0))
            Line((3.5, 0), (3.5, -FILLET2_R))
        make_face()
    revolve(axis=Axis((24.645786009, -38.910874107, -10), (0, 0, -1)), mode=Mode.SUBTRACT)
    with BuildSketch(Plane(origin=(18.1, -38.910874107, -10), x_dir=(1, 0, 0), z_dir=(0, 1, 0))) as fillet2_2_piece_19:
        with BuildLine():
            CenterArc((2.5 - FILLET2_R, -FILLET2_R), FILLET2_R, 0, 90)
            Line((2.5 - FILLET2_R, 0), (2.5, 0))
            Line((2.5, 0), (2.5, -FILLET2_R))
        make_face()
    revolve(axis=Axis((18.1, -38.910874107, -10), (0, 0, -1)), mode=Mode.SUBTRACT)
    # the kernel refuses this fillet: 0.3 mm, written as the material it adds along each edge
    with BuildSketch(Plane(origin=(-39.1, -31.95, 0), x_dir=(1, 0, 0), z_dir=(0, 1, 0)), Plane(origin=(-44.1, 27.45, 0), x_dir=(-1, 0, 0), z_dir=(0, -1, 0))) as fillet2_3_piece_1:
        with BuildLine():
            CenterArc((FILLET2_R, FILLET2_R), FILLET2_R, 180, 90)
            Line((0, FILLET2_R), (0, 0))
            Line((0, 0), (FILLET2_R, 0))
        make_face()
    extrude(amount=59.4)
    with BuildSketch(Plane(origin=(-43.8, -32.25, 0), x_dir=(0, -1, 0), z_dir=(1, 0, 0)), Plane(origin=(-39.4, 27.75, 0), x_dir=(0, 1, 0), z_dir=(-1, 0, 0)), Plane(origin=(38.1, 38.05, 0), x_dir=(1, 0, 0), z_dir=(0, 1, 0)), Plane(origin=(18.1, 42.45, 0), x_dir=(-1, 0, 0), z_dir=(0, -1, 0)), Plane(origin=(8.974280775, -43.610874107, 0), x_dir=(1, 0, 0), z_dir=(0, 1, 0)), Plane(origin=(4.274280775, -43.910874107, 0), x_dir=(0, -1, 0), z_dir=(1, 0, 0)), Plane(origin=(3.974280775, -39.210874107, 0), x_dir=(-1, 0, 0), z_dir=(0, -1, 0)), Plane(origin=(8.674280775, -38.910874107, 0), x_dir=(0, 1, 0), z_dir=(-1, 0, 0))) as fillet2_3_piece_2:
        with BuildLine():
            CenterArc((FILLET2_R, FILLET2_R), FILLET2_R, 180, 90)
            Line((0, FILLET2_R), (0, 0))
            Line((0, 0), (FILLET2_R, 0))
        make_face()
    extrude(amount=4.4)
    with BuildSketch(Plane(origin=(18.4, 37.75, 0), x_dir=(0, -1, 0), z_dir=(1, 0, 0)), Plane(origin=(37.8, 42.75, 0), x_dir=(0, 1, 0), z_dir=(-1, 0, 0))) as fillet2_3_piece_3:
        with BuildLine():
            CenterArc((FILLET2_R, FILLET2_R), FILLET2_R, 180, 90)
            Line((0, FILLET2_R), (0, 0))
            Line((0, 0), (FILLET2_R, 0))
        make_face()
    extrude(amount=19.4)
    with BuildSketch(Plane(origin=(8.674280775, -39.210874107, 0), x_dir=(1, 0, 0), z_dir=(0, -1, 0))) as fillet2_3_piece_4:
        with BuildLine():
            CenterArc((0.3 + FILLET2_R, -FILLET2_R), FILLET2_R, 90, 90)
            Line((0.3, -FILLET2_R), (0.3, 0))
            Line((0.3, 0), (0.3 + FILLET2_R, 0))
        make_face()
    revolve(axis=Axis((8.674280775, -39.210874107, 0), (0, 0, 1)), revolution_arc=90)
    with BuildSketch(Plane(origin=(4.274280775, -39.210874107, 0), x_dir=(0, 1, 0), z_dir=(1, 0, 0))) as fillet2_3_piece_5:
        with BuildLine():
            CenterArc((0.3 + FILLET2_R, -FILLET2_R), FILLET2_R, 90, 90)
            Line((0.3, -FILLET2_R), (0.3, 0))
            Line((0.3, 0), (0.3 + FILLET2_R, 0))
        make_face()
    revolve(axis=Axis((4.274280775, -39.210874107, 0), (0, 0, 1)), revolution_arc=90)
    with BuildSketch(Plane(origin=(4.274280775, -43.610874107, 0), x_dir=(0, -1, 0), z_dir=(1, 0, 0))) as fillet2_3_piece_6:
        with BuildLine():
            CenterArc((0.3 + FILLET2_R, FILLET2_R), FILLET2_R, 180, 90)
            Line((0.3, FILLET2_R), (0.3, 0))
            Line((0.3, 0), (0.3 + FILLET2_R, 0))
        make_face()
    revolve(axis=Axis((4.274280775, -43.610874107, 0), (0, 0, -1)), revolution_arc=90)
    with BuildSketch(Plane(origin=(8.674280775, -43.610874107, 0), x_dir=(1, 0, 0), z_dir=(0, 1, 0))) as fillet2_3_piece_7:
        with BuildLine():
            CenterArc((0.3 + FILLET2_R, FILLET2_R), FILLET2_R, 180, 90)
            Line((0.3, FILLET2_R), (0.3, 0))
            Line((0.3, 0), (0.3 + FILLET2_R, 0))
        make_face()
    revolve(axis=Axis((8.674280775, -43.610874107, 0), (0, 0, -1)), revolution_arc=90)
    with BuildSketch(Plane(origin=(37.8, 42.45, 0), x_dir=(1, 0, 0), z_dir=(0, -1, 0))) as fillet2_3_piece_8:
        with BuildLine():
            CenterArc((0.3 + FILLET2_R, -FILLET2_R), FILLET2_R, 90, 90)
            Line((0.3, -FILLET2_R), (0.3, 0))
            Line((0.3, 0), (0.3 + FILLET2_R, 0))
        make_face()
    revolve(axis=Axis((37.8, 42.45, 0), (0, 0, 1)), revolution_arc=90)
    with BuildSketch(Plane(origin=(18.4, 42.45, 0), x_dir=(0, 1, 0), z_dir=(1, 0, 0))) as fillet2_3_piece_9:
        with BuildLine():
            CenterArc((0.3 + FILLET2_R, -FILLET2_R), FILLET2_R, 90, 90)
            Line((0.3, -FILLET2_R), (0.3, 0))
            Line((0.3, 0), (0.3 + FILLET2_R, 0))
        make_face()
    revolve(axis=Axis((18.4, 42.45, 0), (0, 0, 1)), revolution_arc=90)
    with BuildSketch(Plane(origin=(18.4, 38.05, 0), x_dir=(0, -1, 0), z_dir=(1, 0, 0))) as fillet2_3_piece_10:
        with BuildLine():
            CenterArc((0.3 + FILLET2_R, FILLET2_R), FILLET2_R, 180, 90)
            Line((0.3, FILLET2_R), (0.3, 0))
            Line((0.3, 0), (0.3 + FILLET2_R, 0))
        make_face()
    revolve(axis=Axis((18.4, 38.05, 0), (0, 0, -1)), revolution_arc=90)
    with BuildSketch(Plane(origin=(37.8, 38.05, 0), x_dir=(1, 0, 0), z_dir=(0, 1, 0))) as fillet2_3_piece_11:
        with BuildLine():
            CenterArc((0.3 + FILLET2_R, FILLET2_R), FILLET2_R, 180, 90)
            Line((0.3, FILLET2_R), (0.3, 0))
            Line((0.3, 0), (0.3 + FILLET2_R, 0))
        make_face()
    revolve(axis=Axis((37.8, 38.05, 0), (0, 0, -1)), revolution_arc=90)
    with BuildSketch(Plane(origin=(-39.4, 27.45, 0), x_dir=(1, 0, 0), z_dir=(0, -1, 0))) as fillet2_3_piece_12:
        with BuildLine():
            CenterArc((0.3 + FILLET2_R, -FILLET2_R), FILLET2_R, 90, 90)
            Line((0.3, -FILLET2_R), (0.3, 0))
            Line((0.3, 0), (0.3 + FILLET2_R, 0))
        make_face()
    revolve(axis=Axis((-39.4, 27.45, 0), (0, 0, 1)), revolution_arc=90)
    with BuildSketch(Plane(origin=(-43.8, 27.45, 0), x_dir=(0, 1, 0), z_dir=(1, 0, 0))) as fillet2_3_piece_13:
        with BuildLine():
            CenterArc((0.3 + FILLET2_R, -FILLET2_R), FILLET2_R, 90, 90)
            Line((0.3, -FILLET2_R), (0.3, 0))
            Line((0.3, 0), (0.3 + FILLET2_R, 0))
        make_face()
    revolve(axis=Axis((-43.8, 27.45, 0), (0, 0, 1)), revolution_arc=90)
    with BuildSketch(Plane(origin=(-43.8, -31.95, 0), x_dir=(0, -1, 0), z_dir=(1, 0, 0))) as fillet2_3_piece_14:
        with BuildLine():
            CenterArc((0.3 + FILLET2_R, FILLET2_R), FILLET2_R, 180, 90)
            Line((0.3, FILLET2_R), (0.3, 0))
            Line((0.3, 0), (0.3 + FILLET2_R, 0))
        make_face()
    revolve(axis=Axis((-43.8, -31.95, 0), (0, 0, -1)), revolution_arc=90)
    with BuildSketch(Plane(origin=(-39.4, -31.95, 0), x_dir=(1, 0, 0), z_dir=(0, 1, 0))) as fillet2_3_piece_15:
        with BuildLine():
            CenterArc((0.3 + FILLET2_R, FILLET2_R), FILLET2_R, 180, 90)
            Line((0.3, FILLET2_R), (0.3, 0))
            Line((0.3, 0), (0.3 + FILLET2_R, 0))
        make_face()
    revolve(axis=Axis((-39.4, -31.95, 0), (0, 0, -1)), revolution_arc=90)


solid = part.part
